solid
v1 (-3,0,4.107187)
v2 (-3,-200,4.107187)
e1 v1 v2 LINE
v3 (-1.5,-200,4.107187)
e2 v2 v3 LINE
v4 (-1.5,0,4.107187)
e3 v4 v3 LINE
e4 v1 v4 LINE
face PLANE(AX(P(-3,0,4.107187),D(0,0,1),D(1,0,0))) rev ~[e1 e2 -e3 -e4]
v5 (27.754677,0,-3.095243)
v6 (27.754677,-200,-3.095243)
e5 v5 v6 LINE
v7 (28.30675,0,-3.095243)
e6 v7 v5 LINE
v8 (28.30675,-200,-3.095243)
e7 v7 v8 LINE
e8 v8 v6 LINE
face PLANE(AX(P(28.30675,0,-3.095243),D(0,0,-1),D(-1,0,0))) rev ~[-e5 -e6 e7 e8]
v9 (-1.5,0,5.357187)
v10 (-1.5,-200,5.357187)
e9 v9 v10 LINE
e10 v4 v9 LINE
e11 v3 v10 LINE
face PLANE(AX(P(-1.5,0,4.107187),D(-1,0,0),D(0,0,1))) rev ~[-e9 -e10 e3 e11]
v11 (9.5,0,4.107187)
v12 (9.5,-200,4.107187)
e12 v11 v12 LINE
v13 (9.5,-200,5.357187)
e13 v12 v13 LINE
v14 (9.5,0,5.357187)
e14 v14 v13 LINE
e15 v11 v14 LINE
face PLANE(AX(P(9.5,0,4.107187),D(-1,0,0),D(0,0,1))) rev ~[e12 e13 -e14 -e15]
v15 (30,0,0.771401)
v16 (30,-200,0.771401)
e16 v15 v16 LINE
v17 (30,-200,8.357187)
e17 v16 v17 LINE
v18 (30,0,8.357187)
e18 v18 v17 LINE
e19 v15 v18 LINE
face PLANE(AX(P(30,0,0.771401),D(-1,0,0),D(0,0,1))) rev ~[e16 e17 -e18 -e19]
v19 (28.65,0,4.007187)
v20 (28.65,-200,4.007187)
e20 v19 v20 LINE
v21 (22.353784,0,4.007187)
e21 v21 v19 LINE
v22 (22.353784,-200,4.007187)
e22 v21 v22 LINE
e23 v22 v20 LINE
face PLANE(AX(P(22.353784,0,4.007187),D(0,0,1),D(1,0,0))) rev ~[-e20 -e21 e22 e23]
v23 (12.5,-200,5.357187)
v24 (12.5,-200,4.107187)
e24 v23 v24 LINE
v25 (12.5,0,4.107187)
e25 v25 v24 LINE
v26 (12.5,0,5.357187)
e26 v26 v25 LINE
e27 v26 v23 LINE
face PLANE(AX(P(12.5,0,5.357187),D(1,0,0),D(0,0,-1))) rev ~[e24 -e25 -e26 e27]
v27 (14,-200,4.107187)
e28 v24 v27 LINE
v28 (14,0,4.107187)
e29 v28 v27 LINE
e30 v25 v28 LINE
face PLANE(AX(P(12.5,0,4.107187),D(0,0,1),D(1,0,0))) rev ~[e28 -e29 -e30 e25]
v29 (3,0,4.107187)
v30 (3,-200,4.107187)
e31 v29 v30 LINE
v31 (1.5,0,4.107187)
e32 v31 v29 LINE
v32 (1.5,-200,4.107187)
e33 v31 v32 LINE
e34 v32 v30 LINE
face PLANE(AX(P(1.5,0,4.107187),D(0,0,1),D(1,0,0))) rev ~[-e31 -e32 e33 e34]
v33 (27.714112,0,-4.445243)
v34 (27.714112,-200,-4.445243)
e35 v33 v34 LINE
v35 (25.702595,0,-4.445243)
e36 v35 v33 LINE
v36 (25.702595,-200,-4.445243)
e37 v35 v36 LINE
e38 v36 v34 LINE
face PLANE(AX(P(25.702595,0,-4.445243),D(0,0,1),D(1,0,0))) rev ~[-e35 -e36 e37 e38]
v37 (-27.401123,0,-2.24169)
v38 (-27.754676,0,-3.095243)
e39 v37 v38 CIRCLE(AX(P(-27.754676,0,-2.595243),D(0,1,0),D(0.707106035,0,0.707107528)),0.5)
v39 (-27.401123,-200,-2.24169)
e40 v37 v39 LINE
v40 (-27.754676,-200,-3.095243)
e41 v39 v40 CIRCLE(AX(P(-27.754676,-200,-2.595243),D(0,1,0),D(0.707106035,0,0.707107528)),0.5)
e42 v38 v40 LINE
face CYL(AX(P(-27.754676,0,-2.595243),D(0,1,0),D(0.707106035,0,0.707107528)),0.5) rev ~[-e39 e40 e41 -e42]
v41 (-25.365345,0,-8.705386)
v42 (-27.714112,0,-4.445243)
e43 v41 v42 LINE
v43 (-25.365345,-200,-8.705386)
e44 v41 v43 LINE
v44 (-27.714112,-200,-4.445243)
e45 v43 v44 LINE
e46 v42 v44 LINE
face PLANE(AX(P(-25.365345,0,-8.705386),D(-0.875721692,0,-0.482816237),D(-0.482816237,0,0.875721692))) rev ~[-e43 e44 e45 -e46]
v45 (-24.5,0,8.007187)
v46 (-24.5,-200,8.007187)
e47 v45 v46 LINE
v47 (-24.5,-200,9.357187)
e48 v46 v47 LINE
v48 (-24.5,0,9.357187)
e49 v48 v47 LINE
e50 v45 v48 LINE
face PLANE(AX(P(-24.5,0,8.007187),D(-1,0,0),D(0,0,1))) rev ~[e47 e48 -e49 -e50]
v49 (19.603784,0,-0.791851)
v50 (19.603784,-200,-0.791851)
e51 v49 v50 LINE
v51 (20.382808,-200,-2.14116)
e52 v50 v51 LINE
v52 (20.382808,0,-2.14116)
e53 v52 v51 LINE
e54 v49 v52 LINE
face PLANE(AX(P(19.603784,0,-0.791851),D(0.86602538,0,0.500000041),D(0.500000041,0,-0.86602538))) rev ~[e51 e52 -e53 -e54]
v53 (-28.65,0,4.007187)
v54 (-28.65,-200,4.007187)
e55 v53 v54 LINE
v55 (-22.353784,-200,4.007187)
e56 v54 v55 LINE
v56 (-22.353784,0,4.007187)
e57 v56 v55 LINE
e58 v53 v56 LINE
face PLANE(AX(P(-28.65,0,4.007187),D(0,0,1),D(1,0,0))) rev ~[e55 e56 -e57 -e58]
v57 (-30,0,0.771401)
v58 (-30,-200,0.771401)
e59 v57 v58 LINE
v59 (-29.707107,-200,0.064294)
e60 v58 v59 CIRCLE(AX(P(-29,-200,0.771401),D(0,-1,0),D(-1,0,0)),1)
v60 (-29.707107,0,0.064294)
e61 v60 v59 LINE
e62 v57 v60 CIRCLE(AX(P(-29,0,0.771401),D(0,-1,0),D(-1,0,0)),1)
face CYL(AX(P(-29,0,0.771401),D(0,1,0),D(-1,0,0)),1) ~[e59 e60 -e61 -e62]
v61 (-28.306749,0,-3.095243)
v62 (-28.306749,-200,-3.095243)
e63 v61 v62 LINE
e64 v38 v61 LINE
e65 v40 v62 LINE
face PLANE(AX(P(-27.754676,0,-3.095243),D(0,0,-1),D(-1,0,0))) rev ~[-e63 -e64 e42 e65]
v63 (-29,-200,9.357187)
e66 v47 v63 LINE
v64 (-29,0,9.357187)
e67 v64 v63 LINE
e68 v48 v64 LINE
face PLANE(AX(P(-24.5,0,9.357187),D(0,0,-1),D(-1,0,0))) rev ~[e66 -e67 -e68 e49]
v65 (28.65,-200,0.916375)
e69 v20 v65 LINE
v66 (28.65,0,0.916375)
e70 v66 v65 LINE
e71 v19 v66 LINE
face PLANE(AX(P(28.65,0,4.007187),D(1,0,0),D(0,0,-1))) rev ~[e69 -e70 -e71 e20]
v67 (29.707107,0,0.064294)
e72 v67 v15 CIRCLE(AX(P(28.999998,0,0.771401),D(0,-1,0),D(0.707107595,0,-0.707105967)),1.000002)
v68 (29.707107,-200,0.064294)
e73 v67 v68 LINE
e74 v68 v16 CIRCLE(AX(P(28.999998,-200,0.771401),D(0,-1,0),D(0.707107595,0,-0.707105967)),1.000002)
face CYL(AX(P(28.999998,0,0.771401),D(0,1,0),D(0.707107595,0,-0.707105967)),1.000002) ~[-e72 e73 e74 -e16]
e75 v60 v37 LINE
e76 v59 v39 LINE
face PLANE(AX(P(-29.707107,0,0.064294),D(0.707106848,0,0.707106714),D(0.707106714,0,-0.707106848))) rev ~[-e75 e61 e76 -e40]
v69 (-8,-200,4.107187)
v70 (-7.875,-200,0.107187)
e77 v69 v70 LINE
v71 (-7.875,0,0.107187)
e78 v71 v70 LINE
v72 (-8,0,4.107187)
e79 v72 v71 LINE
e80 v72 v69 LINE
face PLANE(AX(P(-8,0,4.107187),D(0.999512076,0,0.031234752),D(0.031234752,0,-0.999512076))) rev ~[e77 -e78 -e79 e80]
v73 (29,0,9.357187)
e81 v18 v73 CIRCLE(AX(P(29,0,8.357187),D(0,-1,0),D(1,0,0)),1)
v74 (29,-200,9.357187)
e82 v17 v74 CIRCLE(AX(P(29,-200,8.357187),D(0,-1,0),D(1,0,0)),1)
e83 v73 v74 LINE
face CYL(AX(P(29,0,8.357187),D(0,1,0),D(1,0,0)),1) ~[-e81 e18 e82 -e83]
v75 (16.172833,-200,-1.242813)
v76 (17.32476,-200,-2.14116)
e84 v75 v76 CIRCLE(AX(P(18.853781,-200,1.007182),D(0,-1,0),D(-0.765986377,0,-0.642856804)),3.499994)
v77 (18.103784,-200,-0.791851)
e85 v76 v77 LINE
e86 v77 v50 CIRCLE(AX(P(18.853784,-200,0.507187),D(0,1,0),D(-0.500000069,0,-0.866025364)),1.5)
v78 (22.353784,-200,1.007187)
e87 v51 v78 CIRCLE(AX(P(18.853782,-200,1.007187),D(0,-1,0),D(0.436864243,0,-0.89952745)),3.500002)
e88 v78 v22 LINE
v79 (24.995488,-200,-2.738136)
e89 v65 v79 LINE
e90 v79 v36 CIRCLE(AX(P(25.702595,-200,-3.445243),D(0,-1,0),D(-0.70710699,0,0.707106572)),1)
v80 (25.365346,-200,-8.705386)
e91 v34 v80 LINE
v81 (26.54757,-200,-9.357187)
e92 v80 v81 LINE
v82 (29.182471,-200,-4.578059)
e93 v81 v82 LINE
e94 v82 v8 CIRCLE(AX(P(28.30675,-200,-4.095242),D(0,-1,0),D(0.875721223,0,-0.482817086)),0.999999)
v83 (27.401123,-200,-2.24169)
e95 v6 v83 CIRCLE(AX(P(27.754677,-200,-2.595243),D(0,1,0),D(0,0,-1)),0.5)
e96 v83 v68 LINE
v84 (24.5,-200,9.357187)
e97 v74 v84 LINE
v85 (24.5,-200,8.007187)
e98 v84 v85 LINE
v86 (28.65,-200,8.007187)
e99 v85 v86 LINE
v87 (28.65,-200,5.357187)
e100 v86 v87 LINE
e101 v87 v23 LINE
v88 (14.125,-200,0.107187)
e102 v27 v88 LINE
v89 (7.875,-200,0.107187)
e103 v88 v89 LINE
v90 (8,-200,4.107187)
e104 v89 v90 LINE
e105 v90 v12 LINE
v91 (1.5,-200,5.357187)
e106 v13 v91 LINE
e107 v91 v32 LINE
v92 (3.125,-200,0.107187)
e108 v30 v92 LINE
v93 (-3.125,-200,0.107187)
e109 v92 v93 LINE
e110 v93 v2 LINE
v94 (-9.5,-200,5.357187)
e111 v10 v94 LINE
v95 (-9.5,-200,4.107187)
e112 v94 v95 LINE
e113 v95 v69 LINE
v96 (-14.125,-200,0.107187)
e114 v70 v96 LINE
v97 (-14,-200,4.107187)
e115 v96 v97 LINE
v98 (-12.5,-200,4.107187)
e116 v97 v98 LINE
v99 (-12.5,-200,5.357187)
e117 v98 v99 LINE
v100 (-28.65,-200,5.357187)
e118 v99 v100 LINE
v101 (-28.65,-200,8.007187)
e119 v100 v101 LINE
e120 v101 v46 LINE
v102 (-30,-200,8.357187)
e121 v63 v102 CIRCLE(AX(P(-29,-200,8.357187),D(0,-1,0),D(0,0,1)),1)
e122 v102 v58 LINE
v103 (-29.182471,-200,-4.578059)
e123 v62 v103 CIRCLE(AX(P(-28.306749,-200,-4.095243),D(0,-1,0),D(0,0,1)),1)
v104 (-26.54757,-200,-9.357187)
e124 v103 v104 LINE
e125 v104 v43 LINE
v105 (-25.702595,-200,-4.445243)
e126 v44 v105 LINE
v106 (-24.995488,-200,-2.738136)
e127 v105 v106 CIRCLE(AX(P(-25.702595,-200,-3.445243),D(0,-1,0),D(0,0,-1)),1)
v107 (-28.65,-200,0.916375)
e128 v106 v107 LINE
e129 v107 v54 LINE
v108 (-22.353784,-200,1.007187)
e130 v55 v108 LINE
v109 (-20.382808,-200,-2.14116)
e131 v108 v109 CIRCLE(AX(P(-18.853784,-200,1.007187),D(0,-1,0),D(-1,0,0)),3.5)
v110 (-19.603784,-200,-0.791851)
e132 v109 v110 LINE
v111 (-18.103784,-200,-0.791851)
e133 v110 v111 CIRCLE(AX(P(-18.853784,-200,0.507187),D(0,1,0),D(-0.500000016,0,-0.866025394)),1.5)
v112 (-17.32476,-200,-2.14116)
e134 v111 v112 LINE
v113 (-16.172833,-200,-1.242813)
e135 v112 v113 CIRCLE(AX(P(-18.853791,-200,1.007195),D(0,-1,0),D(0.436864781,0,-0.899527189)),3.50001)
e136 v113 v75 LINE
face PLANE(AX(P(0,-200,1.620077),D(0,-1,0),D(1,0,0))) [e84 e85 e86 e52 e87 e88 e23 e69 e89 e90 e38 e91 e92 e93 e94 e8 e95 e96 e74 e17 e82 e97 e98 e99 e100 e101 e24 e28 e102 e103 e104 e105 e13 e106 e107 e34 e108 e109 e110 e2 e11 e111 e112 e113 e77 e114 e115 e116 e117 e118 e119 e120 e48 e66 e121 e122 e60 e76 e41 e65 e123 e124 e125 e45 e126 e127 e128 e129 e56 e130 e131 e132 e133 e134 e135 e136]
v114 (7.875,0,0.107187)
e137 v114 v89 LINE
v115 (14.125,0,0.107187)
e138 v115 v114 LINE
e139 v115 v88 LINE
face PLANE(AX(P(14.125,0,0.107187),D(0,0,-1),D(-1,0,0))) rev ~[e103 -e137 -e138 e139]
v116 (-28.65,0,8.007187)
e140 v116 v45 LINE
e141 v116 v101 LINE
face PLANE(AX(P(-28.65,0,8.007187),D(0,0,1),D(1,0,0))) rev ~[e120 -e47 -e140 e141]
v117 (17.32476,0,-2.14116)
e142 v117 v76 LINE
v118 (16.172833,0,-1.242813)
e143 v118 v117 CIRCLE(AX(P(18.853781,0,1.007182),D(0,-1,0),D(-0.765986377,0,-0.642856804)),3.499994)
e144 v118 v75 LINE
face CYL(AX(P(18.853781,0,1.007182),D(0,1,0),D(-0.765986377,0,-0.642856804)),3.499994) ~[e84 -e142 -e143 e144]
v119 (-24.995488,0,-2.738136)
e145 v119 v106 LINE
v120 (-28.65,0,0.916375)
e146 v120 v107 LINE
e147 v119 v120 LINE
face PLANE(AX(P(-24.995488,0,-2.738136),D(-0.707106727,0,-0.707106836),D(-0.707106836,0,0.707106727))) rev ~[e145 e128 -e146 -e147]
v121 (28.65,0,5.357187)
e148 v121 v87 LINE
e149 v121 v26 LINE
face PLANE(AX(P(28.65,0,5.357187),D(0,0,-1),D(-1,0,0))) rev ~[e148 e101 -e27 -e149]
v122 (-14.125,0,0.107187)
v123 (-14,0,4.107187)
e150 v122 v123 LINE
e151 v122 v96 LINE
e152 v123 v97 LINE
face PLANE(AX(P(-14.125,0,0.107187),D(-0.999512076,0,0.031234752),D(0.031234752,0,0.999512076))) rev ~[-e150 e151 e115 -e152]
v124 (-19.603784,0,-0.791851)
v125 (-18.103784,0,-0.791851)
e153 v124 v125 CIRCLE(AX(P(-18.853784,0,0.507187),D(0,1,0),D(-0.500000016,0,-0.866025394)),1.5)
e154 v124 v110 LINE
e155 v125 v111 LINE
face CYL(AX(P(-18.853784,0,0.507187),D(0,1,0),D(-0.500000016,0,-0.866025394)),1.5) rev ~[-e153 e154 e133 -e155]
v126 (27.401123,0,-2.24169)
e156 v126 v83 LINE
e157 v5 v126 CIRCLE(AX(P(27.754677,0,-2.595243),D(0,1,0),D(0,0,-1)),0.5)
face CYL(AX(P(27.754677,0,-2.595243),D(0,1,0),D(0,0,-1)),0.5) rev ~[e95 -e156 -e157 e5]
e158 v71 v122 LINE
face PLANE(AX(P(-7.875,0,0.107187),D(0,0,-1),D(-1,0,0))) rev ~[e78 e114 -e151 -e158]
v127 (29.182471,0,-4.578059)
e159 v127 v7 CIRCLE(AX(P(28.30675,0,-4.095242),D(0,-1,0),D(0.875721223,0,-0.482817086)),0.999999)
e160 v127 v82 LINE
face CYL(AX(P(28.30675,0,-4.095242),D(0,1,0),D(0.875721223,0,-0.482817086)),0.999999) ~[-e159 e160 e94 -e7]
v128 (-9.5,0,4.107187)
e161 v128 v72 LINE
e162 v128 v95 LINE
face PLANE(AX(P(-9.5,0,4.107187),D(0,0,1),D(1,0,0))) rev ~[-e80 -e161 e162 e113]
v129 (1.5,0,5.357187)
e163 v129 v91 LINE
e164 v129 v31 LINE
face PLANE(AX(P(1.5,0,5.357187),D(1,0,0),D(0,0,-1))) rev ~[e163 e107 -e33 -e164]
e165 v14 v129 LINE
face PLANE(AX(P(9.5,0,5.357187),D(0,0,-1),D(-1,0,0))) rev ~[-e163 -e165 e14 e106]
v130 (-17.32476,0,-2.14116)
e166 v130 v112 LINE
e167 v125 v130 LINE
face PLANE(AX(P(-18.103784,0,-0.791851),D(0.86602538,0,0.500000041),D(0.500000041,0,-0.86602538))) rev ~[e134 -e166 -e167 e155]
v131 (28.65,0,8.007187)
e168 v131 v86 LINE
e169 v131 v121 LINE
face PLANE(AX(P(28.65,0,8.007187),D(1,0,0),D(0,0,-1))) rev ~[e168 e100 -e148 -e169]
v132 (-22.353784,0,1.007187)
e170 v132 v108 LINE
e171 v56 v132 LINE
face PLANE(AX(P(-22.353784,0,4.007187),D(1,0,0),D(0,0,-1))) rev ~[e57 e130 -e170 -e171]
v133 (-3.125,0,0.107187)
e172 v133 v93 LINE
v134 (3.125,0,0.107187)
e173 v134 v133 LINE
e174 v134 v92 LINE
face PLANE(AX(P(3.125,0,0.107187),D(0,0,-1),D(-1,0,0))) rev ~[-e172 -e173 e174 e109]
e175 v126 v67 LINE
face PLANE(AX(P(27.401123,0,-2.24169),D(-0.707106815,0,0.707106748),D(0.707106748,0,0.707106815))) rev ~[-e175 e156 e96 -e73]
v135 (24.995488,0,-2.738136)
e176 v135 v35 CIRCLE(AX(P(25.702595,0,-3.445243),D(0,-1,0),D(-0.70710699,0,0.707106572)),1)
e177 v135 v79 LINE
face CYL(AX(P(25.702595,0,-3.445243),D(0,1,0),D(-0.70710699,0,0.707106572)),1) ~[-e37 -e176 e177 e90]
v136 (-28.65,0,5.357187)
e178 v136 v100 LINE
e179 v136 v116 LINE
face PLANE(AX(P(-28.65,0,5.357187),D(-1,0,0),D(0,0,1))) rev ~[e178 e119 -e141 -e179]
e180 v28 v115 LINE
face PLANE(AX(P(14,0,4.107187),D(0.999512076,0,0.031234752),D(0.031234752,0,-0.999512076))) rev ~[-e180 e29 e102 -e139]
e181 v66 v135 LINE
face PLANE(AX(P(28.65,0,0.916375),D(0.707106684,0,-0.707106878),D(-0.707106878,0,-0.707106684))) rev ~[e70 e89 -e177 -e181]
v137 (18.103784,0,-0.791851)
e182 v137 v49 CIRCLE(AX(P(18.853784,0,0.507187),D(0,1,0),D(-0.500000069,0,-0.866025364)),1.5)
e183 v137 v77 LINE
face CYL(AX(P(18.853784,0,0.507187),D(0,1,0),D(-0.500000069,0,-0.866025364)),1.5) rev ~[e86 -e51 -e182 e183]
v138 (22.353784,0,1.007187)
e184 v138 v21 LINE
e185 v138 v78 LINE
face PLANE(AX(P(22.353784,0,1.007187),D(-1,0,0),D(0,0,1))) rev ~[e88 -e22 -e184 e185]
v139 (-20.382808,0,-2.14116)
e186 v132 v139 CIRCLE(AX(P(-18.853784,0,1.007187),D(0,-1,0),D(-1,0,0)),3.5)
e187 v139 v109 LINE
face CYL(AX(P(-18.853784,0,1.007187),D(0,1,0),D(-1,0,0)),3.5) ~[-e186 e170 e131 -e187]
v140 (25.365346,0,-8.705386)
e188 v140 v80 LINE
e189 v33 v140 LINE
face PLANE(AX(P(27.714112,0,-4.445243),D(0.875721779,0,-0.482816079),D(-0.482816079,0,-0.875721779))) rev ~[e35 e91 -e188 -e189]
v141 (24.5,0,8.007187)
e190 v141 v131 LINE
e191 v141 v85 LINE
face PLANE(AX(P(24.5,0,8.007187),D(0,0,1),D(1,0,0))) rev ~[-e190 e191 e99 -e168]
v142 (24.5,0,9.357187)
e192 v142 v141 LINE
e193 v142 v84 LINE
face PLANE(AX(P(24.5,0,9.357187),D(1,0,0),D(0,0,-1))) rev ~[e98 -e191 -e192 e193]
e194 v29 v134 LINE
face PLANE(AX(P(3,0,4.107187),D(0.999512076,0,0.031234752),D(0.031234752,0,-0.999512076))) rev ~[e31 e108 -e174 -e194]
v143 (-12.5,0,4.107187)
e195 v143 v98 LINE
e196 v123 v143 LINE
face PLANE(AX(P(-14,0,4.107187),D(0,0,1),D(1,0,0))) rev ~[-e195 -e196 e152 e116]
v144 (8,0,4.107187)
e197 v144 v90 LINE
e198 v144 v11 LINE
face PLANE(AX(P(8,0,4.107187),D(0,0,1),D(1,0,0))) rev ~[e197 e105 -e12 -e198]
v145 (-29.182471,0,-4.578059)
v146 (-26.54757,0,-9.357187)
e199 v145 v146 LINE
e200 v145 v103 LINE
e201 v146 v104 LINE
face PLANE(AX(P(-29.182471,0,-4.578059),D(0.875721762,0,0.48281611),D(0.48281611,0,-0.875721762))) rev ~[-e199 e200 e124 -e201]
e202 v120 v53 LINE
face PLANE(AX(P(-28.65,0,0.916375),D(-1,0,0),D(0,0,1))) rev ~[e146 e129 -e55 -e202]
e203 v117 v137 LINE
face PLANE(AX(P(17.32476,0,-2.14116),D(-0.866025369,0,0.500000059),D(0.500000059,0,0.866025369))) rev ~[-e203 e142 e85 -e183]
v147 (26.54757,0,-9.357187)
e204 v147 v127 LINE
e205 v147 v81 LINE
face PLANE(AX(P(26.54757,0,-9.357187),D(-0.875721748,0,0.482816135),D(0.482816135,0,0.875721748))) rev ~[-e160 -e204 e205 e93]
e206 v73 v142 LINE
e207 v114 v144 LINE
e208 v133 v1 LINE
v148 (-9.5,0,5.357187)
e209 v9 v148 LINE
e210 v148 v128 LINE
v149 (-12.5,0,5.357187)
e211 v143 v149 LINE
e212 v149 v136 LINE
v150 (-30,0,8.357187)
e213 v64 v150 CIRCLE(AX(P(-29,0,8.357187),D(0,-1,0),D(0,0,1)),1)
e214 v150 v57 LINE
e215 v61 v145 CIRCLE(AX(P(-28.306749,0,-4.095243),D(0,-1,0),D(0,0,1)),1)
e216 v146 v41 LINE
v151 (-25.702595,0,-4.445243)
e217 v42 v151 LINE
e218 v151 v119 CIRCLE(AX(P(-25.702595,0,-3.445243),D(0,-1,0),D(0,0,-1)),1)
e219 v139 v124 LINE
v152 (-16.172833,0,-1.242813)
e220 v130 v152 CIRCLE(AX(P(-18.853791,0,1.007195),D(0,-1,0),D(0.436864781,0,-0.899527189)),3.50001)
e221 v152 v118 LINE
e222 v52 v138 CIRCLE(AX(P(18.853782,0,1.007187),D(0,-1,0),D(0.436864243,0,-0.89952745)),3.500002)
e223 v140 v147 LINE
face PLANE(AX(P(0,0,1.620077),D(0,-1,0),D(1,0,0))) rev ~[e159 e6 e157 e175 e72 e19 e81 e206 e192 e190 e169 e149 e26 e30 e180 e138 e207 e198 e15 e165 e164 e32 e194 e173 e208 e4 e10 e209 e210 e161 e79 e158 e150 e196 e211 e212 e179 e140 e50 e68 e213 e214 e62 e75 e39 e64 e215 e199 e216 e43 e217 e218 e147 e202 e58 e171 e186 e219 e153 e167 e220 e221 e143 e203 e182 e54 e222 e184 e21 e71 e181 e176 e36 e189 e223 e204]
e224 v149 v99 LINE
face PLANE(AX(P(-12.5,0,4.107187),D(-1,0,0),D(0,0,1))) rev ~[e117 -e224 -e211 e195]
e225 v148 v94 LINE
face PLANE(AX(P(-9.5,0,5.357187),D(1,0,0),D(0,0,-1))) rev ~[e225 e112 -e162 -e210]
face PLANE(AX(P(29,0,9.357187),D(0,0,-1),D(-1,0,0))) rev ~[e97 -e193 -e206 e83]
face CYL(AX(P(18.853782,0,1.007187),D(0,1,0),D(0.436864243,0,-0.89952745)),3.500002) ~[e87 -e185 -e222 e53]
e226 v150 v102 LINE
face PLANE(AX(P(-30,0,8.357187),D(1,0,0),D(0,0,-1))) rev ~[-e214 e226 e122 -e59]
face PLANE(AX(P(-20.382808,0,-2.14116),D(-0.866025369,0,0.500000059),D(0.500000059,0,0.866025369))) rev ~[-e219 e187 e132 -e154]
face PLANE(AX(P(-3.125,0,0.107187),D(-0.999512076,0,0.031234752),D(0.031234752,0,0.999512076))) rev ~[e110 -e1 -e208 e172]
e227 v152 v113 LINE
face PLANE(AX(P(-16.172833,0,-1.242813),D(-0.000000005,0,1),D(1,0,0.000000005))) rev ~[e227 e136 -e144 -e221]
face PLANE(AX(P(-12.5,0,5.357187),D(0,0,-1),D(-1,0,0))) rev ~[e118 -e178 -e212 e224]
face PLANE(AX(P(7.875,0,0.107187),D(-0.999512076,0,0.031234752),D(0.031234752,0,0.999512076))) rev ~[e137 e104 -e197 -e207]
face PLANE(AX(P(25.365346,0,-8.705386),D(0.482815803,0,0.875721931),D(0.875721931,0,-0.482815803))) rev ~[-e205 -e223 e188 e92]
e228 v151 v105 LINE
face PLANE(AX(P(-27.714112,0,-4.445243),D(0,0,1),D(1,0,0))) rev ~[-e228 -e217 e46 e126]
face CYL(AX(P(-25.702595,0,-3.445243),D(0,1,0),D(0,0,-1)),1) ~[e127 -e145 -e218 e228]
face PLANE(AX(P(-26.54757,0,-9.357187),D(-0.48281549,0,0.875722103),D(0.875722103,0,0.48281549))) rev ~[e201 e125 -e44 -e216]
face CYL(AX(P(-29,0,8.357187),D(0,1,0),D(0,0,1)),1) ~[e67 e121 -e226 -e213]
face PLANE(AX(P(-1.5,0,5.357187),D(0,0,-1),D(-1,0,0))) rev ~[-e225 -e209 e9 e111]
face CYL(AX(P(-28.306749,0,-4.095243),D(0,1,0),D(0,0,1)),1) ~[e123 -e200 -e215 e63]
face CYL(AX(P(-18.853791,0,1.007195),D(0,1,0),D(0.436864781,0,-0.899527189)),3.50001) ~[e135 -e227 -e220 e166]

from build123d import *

# Parameters (mm, degrees)
F1_DEPTH = 200


# Not quite as in the source:
# - ends of sketch curves that miss each other by under 0.0002 mm in the source are joined


with BuildPart() as f1:
    # F0 (on Front) → F1 (new body)
    with BuildSketch(Plane.XZ):
        with BuildLine():
            Line((-18.103784, -0.791851), (-17.32476, -2.14116))
            ThreePointArc((-17.32476, -2.14116), (-16.7014064944, -1.7527534112), (-16.1728328101, -1.2428131594))
            Line((-16.1728328101, -1.2428131594), (16.172833, -1.242813))
            ThreePointArc((16.172833, -1.242813), (16.7014064944, -1.7527534112), (17.3247602013, -2.1411595856))
            Line((17.3247602013, -2.1411595856), (18.103784, -0.791851))
            ThreePointArc((18.103784, -0.791851), (18.853784, 2.007187), (19.6037840458, -0.7918510793))
            Line((19.6037840458, -0.7918510793), (20.382808, -2.14116))
            ThreePointArc((20.382808, -2.14116), (21.820396824, -0.8500174455), (22.353784, 1.007187))
            Line((22.353784, 1.007187), (22.353784, 4.007187))
            Line((22.353784, 4.007187), (28.65, 4.007187))
            Line((28.65, 4.007187), (28.65, 0.916375))
            Line((28.65, 0.916375), (24.995488, -2.738136))
            ThreePointArc((24.995488, -2.738136), (24.7787154675, -3.8279264324), (25.702595, -4.445243))
            Line((25.702595, -4.445243), (27.714112, -4.445243))
            Line((27.714112, -4.445243), (25.365346, -8.705386))
            Line((25.365346, -8.705386), (26.54757, -9.357187))
            Line((26.54757, -9.357187), (29.182471, -4.578059))
            ThreePointArc((29.182471, -4.578059), (29.1678006221, -3.5867237514), (28.30675, -3.095243))
            Line((28.30675, -3.095243), (27.754677, -3.095243))
            ThreePointArc((27.754677, -3.095243), (27.292737369, -2.7865850428), (27.4011231094, -2.2416901094))
            Line((27.4011231094, -2.2416901094), (29.707107, 0.064294))
            ThreePointArc((29.707107, 0.064294), (29.9238795325, 0.3887175676), (30, 0.771401))
            Line((30, 0.771401), (30, 8.357187))
            ThreePointArc((30, 8.357187), (29.7071067812, 9.0642937812), (29, 9.357187))
            Line((29, 9.357187), (24.5, 9.357187))
            Line((24.5, 9.357187), (24.5, 8.007187))
            Line((24.5, 8.007187), (28.65, 8.007187))
            Line((28.65, 8.007187), (28.65, 5.357187))
            Line((28.65, 5.357187), (12.5, 5.357187))
            Line((12.5, 5.357187), (12.5, 4.107187))
            Line((12.5, 4.107187), (14, 4.107187))
            Line((14, 4.107187), (14.125, 0.107187))
            Line((14.125, 0.107187), (7.875, 0.107187))
            Line((7.875, 0.107187), (8, 4.107187))
            Line((8, 4.107187), (9.5, 4.107187))
            Line((9.5, 4.107187), (9.5, 5.357187))
            Line((9.5, 5.357187), (1.5, 5.357187))
            Line((1.5, 5.357187), (1.5, 4.107187))
            Line((1.5, 4.107187), (3, 4.107187))
            Line((3, 4.107187), (3.125, 0.107187))
            Line((3.125, 0.107187), (-3.125, 0.107187))
            Line((-3.125, 0.107187), (-3, 4.107187))
            Line((-3, 4.107187), (-1.5, 4.107187))
            Line((-1.5, 4.107187), (-1.5, 5.357187))
            Line((-1.5, 5.357187), (-9.5, 5.357187))
            Line((-9.5, 5.357187), (-9.5, 4.107187))
            Line((-9.5, 4.107187), (-8, 4.107187))
            Line((-8, 4.107187), (-7.875, 0.107187))
            Line((-7.875, 0.107187), (-14.125, 0.107187))
            Line((-14.125, 0.107187), (-14, 4.107187))
            Line((-14, 4.107187), (-12.5, 4.107187))
            Line((-12.5, 4.107187), (-12.5, 5.357187))
            Line((-12.5, 5.357187), (-28.65, 5.357187))
            Line((-28.65, 5.357187), (-28.65, 8.007187))
            Line((-28.65, 8.007187), (-24.5, 8.007187))
            Line((-24.5, 8.007187), (-24.5, 9.357187))
            Line((-24.5, 9.357187), (-29, 9.357187))
            ThreePointArc((-29, 9.357187), (-29.7071067812, 9.0642937812), (-30, 8.357187))
            Line((-30, 8.357187), (-30, 0.771401))
            ThreePointArc((-30, 0.771401), (-29.9238795325, 0.3887175676), (-29.7071067812, 0.0642942188))
            Line((-29.7071067812, 0.0642942188), (-27.401123, -2.24169))
            ThreePointArc((-27.401123, -2.24169), (-27.2927362337, -2.7865847162), (-27.754676, -3.095243))
            Line((-27.754676, -3.095243), (-28.306749, -3.095243))
            ThreePointArc((-28.306749, -3.095243), (-29.1677994994, -3.5867235436), (-29.1824708638, -4.5780589249))
            Line((-29.1824708638, -4.5780589249), (-26.54757, -9.357187))
            Line((-26.54757, -9.357187), (-25.365345, -8.705386))
            Line((-25.365345, -8.705386), (-27.714112, -4.445243))
            Line((-27.714112, -4.445243), (-25.702595, -4.445243))
            ThreePointArc((-25.702595, -4.445243), (-24.7787154675, -3.8279264324), (-24.9954882188, -2.7381362188))
            Line((-24.9954882188, -2.7381362188), (-28.65, 0.916375))
            Line((-28.65, 0.916375), (-28.65, 4.007187))
            Line((-28.65, 4.007187), (-22.353784, 4.007187))
            Line((-22.353784, 4.007187), (-22.353784, 1.007187))
            ThreePointArc((-22.353784, 1.007187), (-21.820396824, -0.8500174455), (-20.3828077987, -2.1411595856))
            Line((-20.3828077987, -2.1411595856), (-19.603784, -0.791851))
            ThreePointArc((-19.603784, -0.791851), (-18.853784, 2.007187), (-18.103784, -0.791851))
        make_face()
    extrude(amount=F1_DEPTH)


solid = f1.part
